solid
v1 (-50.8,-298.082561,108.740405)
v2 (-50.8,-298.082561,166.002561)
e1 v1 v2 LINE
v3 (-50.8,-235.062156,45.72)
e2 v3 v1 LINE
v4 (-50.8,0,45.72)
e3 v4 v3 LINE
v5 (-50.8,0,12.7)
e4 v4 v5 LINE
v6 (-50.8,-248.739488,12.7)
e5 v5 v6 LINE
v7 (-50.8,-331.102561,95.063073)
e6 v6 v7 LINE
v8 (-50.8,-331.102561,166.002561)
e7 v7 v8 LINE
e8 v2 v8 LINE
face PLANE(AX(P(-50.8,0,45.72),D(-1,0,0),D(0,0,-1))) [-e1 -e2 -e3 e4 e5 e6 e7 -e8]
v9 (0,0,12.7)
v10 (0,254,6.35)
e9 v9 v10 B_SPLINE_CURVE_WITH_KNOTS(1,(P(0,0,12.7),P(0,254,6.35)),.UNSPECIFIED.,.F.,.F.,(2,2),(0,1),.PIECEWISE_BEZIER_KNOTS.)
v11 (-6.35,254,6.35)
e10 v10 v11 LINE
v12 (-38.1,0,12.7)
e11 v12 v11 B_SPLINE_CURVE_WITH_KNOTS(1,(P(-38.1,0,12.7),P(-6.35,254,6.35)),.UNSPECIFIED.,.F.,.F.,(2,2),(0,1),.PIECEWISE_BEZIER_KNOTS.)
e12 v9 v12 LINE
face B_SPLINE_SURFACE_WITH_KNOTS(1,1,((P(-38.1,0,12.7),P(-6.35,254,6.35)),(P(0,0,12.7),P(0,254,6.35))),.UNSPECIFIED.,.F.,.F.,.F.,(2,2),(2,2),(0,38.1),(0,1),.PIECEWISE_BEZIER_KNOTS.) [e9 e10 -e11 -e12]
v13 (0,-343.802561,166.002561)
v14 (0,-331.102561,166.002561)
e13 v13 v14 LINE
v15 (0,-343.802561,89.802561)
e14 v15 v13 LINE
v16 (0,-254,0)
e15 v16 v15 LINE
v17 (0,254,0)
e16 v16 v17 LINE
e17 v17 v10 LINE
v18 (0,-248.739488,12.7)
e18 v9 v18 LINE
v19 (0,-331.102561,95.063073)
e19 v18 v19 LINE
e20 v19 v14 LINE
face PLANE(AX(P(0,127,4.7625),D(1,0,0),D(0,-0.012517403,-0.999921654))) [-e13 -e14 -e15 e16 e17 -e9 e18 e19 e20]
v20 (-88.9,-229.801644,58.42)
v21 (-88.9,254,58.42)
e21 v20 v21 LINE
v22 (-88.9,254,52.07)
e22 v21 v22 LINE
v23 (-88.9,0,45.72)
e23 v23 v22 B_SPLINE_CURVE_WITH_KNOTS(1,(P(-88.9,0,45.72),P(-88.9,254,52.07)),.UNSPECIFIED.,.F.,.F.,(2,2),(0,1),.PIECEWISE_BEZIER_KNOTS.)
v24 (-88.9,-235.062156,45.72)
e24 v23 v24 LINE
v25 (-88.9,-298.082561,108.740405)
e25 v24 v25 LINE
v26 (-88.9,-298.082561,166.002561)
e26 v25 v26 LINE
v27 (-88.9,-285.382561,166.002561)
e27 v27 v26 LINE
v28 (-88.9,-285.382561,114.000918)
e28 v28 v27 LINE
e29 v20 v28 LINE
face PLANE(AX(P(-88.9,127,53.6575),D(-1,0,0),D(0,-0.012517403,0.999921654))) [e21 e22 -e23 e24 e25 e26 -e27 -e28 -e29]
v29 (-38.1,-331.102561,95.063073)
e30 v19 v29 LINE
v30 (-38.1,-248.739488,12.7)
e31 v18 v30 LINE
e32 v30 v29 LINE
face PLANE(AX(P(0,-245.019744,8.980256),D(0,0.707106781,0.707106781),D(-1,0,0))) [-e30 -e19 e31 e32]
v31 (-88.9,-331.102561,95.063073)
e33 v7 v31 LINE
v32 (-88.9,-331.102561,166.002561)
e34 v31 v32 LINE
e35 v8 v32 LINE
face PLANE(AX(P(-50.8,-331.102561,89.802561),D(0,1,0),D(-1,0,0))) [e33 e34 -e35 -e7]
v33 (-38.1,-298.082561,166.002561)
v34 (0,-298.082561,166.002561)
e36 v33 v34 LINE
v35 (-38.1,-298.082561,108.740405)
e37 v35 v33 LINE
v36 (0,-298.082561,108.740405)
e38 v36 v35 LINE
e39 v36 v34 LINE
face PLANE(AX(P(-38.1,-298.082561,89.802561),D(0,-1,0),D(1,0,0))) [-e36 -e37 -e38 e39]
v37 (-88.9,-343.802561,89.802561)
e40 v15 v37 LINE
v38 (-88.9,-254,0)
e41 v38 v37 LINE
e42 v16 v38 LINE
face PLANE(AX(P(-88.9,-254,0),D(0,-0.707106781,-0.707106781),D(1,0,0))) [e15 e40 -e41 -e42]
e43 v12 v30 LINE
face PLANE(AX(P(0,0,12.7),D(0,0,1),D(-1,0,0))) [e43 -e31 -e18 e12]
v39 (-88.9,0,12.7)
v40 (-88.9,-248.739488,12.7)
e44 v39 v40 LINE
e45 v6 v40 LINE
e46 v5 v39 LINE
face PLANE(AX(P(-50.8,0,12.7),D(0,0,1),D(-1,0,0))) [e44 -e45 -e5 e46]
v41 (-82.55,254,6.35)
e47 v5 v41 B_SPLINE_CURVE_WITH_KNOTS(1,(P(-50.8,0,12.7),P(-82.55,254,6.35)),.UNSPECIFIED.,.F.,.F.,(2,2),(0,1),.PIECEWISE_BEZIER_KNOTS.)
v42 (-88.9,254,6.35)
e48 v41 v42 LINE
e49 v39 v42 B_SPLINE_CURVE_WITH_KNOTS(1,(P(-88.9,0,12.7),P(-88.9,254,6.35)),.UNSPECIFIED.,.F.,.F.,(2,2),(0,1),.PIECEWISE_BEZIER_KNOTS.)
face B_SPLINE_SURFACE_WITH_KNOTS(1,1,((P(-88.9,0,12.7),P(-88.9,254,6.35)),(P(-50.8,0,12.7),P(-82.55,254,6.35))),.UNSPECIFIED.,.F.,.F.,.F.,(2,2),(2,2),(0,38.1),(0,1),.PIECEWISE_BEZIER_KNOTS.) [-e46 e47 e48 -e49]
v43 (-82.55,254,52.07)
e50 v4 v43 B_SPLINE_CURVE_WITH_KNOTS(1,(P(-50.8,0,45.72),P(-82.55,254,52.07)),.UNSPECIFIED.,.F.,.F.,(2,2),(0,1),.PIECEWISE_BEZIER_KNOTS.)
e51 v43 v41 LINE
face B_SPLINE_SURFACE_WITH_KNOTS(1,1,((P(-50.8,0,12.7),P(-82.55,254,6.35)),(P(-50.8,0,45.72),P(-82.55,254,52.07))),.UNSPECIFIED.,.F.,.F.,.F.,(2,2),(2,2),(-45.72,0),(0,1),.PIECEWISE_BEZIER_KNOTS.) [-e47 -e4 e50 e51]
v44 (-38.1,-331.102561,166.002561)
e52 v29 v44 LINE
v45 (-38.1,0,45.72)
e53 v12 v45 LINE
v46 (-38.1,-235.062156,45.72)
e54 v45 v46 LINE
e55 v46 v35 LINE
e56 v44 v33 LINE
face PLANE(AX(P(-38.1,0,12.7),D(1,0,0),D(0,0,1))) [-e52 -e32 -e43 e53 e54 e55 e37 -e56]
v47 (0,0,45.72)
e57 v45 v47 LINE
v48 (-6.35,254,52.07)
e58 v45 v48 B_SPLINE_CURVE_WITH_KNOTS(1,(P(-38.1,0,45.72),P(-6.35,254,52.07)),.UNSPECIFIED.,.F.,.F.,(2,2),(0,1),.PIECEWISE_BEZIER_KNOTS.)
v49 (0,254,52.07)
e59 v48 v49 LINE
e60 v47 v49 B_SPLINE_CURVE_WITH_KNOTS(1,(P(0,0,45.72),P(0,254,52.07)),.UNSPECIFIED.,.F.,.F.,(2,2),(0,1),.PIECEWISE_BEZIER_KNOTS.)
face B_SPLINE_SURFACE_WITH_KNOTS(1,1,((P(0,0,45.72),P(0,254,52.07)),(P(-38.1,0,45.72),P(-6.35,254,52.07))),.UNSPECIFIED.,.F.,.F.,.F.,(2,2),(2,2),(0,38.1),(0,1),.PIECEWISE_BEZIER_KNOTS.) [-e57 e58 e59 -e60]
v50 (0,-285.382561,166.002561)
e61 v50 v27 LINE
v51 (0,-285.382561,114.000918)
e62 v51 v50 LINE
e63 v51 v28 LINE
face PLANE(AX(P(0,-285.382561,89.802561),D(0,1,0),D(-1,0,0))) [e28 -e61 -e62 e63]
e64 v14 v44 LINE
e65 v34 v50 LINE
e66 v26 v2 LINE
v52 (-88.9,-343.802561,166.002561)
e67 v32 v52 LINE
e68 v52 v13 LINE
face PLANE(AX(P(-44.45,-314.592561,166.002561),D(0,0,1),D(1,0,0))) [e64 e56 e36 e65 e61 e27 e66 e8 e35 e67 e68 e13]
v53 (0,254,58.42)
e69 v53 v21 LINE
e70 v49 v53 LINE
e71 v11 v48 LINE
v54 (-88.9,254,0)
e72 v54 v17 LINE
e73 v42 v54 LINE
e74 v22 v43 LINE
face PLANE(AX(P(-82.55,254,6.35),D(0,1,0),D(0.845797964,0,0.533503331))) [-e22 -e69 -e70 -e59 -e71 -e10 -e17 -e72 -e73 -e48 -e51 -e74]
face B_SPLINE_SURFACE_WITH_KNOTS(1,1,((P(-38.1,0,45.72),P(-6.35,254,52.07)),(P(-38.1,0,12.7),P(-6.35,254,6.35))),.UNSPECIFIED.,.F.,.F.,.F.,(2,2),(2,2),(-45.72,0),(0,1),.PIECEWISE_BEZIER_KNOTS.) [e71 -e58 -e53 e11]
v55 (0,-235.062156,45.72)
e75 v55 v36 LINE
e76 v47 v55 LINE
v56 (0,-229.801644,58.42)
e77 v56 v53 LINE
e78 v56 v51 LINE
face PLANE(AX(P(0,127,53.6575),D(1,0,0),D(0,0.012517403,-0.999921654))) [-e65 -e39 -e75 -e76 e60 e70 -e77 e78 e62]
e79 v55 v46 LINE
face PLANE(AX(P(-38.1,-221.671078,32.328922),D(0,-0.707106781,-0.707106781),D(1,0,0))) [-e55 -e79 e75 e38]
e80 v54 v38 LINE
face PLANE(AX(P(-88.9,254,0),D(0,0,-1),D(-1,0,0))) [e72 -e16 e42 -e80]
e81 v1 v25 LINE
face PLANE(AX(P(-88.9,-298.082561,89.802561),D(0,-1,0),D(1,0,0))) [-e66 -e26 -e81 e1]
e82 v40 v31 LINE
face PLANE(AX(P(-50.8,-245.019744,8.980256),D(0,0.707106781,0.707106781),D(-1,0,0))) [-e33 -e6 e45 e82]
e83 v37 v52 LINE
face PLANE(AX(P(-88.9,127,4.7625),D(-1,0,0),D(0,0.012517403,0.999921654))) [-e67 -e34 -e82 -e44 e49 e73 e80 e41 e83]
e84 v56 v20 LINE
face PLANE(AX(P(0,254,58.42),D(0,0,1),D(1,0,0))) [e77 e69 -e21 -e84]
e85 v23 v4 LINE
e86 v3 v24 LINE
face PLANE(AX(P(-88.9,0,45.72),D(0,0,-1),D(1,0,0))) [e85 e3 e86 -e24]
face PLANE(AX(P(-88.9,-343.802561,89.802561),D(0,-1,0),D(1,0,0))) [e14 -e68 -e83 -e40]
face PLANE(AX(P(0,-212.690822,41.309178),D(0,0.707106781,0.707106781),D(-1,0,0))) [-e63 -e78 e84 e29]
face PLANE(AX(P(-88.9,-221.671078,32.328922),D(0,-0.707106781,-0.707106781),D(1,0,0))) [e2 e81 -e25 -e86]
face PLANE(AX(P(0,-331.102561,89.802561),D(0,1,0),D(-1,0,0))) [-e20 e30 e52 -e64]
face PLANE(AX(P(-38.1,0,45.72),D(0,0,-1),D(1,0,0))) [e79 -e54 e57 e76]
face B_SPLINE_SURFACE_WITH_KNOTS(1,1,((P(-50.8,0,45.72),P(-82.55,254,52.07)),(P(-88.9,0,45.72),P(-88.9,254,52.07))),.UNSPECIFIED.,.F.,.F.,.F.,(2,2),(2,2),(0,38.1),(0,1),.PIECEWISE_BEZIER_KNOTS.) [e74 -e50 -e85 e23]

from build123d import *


with BuildPart() as f2:
    # F2: sweep along a path in F1
    with BuildLine(Plane.YZ) as f2_path:
        Line((0, 0), (-254, 0))
        Line((-254, 0), (-343.8025612107, 89.8025612107))
        Line((-343.8025612107, 89.8025612107), (-343.8025612107, 166.0025612107))
    # F0 (on Front) → F2 (sweep)
    with BuildSketch(Plane.XZ):
        Polygon((-88.9, 12.7), (-88.9, 0), (0, 0), (0, 12.7), (-38.1, 12.7), (-38.1, 45.72), (0, 45.72), (0, 58.42), (-88.9, 58.42), (-88.9, 45.72), (-50.8, 45.72), (-50.8, 12.7), align=None)
    sweep(path=f2_path.line, transition=Transition.RIGHT)

    # F2_face (on face) → F5 section 0
    with BuildSketch(Plane(origin=(-44.45, 0, 29.21), x_dir=(-1, 0, 0), z_dir=(0, 1, 0))):
        Polygon((44.45, -16.51), (6.35, -16.51), (6.35, 16.51), (44.45, 16.51), (44.45, 29.21), (-44.45, 29.21), (-44.45, 16.51), (-6.35, 16.51), (-6.35, -16.51), (-44.45, -16.51), (-44.45, -29.21), (44.45, -29.21), align=None)
    # F4 (on offset) → F5 section 1
    with BuildSketch(Plane.XZ.offset(-254)):
        Polygon((-88.9, 0), (0, 0), (0, 6.35), (-6.35, 6.35), (-6.35, 52.07), (0, 52.07), (0, 58.42), (-88.9, 58.42), (-88.9, 52.07), (-82.55, 52.07), (-82.55, 6.35), (-88.9, 6.35), align=None)
    loft()


solid = f2.part
